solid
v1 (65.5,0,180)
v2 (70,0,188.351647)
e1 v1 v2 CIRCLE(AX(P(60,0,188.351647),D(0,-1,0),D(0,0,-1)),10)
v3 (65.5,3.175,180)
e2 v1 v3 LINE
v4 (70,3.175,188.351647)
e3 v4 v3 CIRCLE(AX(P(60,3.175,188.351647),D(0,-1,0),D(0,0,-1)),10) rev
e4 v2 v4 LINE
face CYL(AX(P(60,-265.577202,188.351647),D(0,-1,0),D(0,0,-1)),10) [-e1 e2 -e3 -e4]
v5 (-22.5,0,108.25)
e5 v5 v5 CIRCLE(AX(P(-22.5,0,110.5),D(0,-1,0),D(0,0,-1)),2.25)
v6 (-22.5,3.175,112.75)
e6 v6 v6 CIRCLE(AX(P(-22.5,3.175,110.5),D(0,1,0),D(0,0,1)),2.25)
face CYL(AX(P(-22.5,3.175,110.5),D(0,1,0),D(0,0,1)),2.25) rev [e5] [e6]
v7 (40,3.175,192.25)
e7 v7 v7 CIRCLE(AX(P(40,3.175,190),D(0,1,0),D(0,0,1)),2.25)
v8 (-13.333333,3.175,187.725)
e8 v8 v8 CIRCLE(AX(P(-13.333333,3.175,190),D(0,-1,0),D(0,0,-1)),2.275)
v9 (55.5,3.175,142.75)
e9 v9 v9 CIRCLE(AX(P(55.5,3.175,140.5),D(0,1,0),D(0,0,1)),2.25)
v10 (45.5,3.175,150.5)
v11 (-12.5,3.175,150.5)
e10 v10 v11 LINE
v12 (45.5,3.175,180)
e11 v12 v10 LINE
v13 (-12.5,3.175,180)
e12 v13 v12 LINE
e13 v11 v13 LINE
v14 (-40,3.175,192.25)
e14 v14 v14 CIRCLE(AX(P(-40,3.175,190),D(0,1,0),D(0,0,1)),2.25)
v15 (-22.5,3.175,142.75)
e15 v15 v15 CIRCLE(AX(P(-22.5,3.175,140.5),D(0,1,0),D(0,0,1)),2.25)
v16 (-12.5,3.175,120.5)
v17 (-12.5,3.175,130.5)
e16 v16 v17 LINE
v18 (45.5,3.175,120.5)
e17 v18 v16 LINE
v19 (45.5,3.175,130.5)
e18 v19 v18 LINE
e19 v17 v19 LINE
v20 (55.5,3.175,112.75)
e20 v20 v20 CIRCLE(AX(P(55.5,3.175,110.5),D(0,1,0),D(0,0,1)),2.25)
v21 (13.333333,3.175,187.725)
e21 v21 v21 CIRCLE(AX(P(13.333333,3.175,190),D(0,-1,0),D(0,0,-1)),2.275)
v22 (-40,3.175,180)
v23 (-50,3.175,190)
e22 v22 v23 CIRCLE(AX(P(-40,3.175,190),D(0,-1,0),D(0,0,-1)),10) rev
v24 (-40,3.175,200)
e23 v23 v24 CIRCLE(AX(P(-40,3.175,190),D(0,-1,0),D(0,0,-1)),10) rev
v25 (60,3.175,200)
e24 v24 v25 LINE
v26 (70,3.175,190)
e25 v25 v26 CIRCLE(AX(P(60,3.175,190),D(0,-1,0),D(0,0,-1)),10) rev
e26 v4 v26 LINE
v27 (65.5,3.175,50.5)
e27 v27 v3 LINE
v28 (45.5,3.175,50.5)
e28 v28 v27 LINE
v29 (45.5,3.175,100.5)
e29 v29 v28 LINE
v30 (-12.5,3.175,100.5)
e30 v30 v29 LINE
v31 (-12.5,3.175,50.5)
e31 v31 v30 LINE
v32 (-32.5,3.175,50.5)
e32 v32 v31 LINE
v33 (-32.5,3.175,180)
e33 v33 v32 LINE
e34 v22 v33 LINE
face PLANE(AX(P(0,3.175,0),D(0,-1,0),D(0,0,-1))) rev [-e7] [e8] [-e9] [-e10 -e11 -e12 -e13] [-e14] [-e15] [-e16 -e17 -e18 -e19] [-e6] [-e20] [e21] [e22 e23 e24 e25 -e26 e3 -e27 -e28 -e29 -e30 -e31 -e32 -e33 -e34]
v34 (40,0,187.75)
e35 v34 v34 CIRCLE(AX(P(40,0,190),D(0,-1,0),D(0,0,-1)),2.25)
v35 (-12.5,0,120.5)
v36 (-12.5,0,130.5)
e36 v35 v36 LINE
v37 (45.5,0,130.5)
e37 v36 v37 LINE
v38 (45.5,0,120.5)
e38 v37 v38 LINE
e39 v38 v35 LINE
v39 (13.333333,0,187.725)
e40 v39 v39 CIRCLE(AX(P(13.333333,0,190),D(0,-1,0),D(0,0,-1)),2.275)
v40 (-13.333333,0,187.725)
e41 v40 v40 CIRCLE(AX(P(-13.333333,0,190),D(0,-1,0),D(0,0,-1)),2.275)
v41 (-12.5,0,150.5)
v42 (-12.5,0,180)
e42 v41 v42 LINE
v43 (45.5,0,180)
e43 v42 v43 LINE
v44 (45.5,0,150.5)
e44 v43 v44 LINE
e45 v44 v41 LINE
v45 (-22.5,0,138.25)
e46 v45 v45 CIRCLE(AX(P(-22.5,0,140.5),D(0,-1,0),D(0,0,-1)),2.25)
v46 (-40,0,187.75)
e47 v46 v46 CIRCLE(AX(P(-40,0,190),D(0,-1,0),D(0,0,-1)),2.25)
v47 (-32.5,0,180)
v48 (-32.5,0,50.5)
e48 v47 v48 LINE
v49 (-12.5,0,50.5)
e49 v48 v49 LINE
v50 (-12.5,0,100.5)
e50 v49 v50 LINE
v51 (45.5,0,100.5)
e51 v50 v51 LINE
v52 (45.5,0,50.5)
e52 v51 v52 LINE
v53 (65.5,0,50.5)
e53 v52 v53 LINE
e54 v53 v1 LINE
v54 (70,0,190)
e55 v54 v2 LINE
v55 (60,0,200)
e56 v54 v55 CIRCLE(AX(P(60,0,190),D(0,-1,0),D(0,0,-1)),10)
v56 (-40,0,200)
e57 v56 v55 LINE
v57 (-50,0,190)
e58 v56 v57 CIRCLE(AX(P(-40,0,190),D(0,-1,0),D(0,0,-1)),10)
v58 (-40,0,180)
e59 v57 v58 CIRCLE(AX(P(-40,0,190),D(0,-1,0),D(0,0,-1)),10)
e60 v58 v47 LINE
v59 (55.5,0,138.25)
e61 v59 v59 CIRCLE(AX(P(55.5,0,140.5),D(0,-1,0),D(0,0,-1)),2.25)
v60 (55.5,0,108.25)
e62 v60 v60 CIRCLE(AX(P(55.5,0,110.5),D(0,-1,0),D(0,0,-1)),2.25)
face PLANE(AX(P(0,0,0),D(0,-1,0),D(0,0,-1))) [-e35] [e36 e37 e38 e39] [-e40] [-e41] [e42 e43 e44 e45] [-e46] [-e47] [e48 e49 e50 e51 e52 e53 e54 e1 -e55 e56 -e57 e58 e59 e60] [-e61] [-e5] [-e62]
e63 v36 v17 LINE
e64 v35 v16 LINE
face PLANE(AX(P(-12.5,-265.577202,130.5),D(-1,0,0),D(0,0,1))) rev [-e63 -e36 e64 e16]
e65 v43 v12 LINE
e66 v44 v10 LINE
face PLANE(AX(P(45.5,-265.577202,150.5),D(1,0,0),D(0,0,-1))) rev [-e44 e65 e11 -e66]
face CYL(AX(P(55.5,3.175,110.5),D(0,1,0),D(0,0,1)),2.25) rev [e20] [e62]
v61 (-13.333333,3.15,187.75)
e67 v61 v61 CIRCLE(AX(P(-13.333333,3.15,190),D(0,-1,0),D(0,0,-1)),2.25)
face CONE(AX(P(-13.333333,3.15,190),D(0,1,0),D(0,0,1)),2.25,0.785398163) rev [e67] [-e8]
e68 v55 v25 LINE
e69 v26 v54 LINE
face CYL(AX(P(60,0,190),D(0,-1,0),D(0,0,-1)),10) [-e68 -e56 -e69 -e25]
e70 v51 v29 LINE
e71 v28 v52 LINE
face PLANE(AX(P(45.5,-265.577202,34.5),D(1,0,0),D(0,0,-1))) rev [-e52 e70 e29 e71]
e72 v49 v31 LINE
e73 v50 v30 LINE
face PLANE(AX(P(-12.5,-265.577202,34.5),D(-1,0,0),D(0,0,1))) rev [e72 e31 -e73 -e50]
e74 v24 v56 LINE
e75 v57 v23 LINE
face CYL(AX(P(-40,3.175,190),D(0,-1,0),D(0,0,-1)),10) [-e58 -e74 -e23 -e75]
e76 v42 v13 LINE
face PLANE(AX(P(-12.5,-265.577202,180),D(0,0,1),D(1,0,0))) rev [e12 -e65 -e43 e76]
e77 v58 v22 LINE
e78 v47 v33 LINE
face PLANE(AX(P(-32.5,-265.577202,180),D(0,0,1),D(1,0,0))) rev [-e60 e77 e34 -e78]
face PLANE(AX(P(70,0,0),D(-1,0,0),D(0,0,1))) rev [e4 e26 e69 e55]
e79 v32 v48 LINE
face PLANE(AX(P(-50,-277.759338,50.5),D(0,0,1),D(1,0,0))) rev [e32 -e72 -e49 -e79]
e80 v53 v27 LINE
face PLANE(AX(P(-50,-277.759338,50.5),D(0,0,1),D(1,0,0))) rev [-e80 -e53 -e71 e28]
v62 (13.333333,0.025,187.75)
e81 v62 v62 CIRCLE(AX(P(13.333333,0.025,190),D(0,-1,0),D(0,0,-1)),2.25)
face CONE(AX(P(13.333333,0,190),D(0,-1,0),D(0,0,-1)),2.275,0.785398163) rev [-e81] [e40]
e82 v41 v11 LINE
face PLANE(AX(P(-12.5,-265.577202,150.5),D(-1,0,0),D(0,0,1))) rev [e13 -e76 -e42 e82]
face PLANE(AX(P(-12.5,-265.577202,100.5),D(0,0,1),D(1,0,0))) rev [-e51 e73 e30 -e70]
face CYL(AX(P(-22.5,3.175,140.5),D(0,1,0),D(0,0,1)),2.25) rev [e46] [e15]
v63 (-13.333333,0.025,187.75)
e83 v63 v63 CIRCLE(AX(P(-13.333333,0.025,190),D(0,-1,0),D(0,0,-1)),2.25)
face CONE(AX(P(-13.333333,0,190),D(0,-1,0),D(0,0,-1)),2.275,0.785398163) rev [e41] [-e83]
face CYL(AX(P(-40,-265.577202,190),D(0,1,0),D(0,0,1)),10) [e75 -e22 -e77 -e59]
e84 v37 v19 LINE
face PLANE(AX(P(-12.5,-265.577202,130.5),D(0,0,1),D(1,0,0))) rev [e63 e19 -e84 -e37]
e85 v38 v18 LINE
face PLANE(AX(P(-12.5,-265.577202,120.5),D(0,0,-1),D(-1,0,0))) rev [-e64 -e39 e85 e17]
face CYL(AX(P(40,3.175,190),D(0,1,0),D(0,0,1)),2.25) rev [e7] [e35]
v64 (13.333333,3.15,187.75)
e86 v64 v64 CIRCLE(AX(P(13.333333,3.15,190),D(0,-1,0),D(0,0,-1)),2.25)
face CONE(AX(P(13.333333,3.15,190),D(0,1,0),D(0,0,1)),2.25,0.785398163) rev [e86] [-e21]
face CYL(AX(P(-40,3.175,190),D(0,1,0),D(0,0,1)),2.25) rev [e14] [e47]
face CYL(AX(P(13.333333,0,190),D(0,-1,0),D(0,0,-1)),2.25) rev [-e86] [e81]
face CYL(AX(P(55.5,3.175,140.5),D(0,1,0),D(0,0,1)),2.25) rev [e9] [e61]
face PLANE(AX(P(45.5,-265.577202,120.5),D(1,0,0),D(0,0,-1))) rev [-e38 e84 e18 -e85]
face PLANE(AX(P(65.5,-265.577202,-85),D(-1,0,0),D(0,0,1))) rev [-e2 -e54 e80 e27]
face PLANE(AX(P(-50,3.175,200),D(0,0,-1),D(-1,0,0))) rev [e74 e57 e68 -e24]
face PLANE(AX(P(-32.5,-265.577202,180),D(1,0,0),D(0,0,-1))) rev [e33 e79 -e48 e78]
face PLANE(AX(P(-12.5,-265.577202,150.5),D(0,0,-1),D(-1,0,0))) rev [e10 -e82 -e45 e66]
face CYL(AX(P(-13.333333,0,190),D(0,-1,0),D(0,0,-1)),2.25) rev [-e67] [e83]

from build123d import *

# Parameters (mm, degrees)
SKETCH1_W                     = 100
SKETCH1_H                     = 400
BOSS_EXTRUDE1_DEPTH           = 3.175
M4_CLEARANCE_HOLE2_D          = 4.5
SKETCH7_W                     = 400
SKETCH7_H                     = 3.175
BOSS_EXTRUDE2_DEPTH           = 20
M4_CLEARANCE_HOLE1_D          = 4.5
SKETCH13_W                    = 17.5
SKETCH13_H                    = 265
SKETCH13_W_2                  = 58
SKETCH13_H_2                  = 69.5
SKETCH13_W_3                  = 4.5
SKETCH13_H_3                  = 66
SKETCH13_H_4                  = 10
SKETCH13_H_5                  = 29.5
SKETCH13_H_6                  = 75
CUT_EXTRUDE1_DEPTH            = 3.175
FILLET1_R                     = 10
SKETCH14_W                    = 120
SKETCH14_H                    = 250.5
CUT_EXTRUDE2_DEPTH            = 3.175
M4_CLEARANCE_HOLE3_AT_2_COUNT = 2
M4_CLEARANCE_HOLE3_AT_2_PITCH = 26.666666667


with BuildPart() as part:
    # Sketch1 → Boss-Extrude1 (new body)
    with BuildSketch(Plane(origin=(0, 0, 0), x_dir=(1, 0, 0), z_dir=(0, 1, 0))):
        Rectangle(SKETCH1_W, SKETCH1_H)
    extrude(amount=BOSS_EXTRUDE1_DEPTH)

    # M4 Clearance Hole2 (through all)
    with Locations(Plane(origin=(0, 3.175, 0), x_dir=(1, 0, 0), z_dir=(0, 1, 0))):
        with Locations((-40, 190), (40, 190), (40, -190), (-40, -190), (-40, 95), (40, 95)):
            Hole(M4_CLEARANCE_HOLE2_D / 2)

    # Sketch7 → Boss-Extrude2 (add)
    with BuildSketch(Plane(origin=(50, 0, 0), x_dir=(0, 0, -1), z_dir=(1, 0, 0))):
        with Locations((0, 1.5875)):
            Rectangle(SKETCH7_W, SKETCH7_H)
    extrude(amount=BOSS_EXTRUDE2_DEPTH)

    # M4 Clearance Hole1 (through all)
    with Locations(Plane(origin=(0, 3.175, 0), x_dir=(1, 0, 0), z_dir=(0, 1, 0))):
        with Locations((55.5, -140.5), (55.5, -110.5), (-22.5, -110.5), (-22.5, -140.5), (-22.5, -24.5), (-22.5, 5.5), (55.5, 5.5), (55.5, -24.5)):
            Hole(M4_CLEARANCE_HOLE1_D / 2)

    # Sketch13 → Cut-Extrude1 (cut)
    with BuildSketch(Plane(origin=(0, 3.175, 0), x_dir=(1, 0, 0), z_dir=(0, 1, 0))):
        with Locations((-41.25, -47.5)):
            Rectangle(SKETCH13_W, SKETCH13_H)
        with Locations((16.5, 50.25)):
            Rectangle(SKETCH13_W_2, SKETCH13_H_2)
        with Locations((67.75, -47.5)):
            Rectangle(SKETCH13_W_3, SKETCH13_H)
        with Locations((16.5, -67.5)):
            Rectangle(SKETCH13_W_2, SKETCH13_H_3)
        with Locations((16.5, -125.5)):
            Rectangle(SKETCH13_W_2, SKETCH13_H_4)
        with Locations((16.5, -165.25)):
            Rectangle(SKETCH13_W_2, SKETCH13_H_5)
        with Locations((-41.25, 142.5)):
            Rectangle(SKETCH13_W, SKETCH13_H_6)
        with Locations((16.5, 142.5)):
            Rectangle(SKETCH13_W_2, SKETCH13_H_6)
        with Locations((67.75, 142.5)):
            Rectangle(SKETCH13_W_3, SKETCH13_H_6)
        with Locations((16.5, -9.5)):
            Rectangle(SKETCH13_W_2, SKETCH13_H_4)
    extrude(amount=-CUT_EXTRUDE1_DEPTH, mode=Mode.SUBTRACT)

    # Fillet1
    # the kernel refuses this fillet: 10 mm, written as the material it takes off along each edge
    with BuildSketch(Plane(origin=(70, 24.054116361, -180), x_dir=(0, 0, -1), z_dir=(0, -1, 0)), Plane(origin=(70, 24.054116361, -85), x_dir=(0, 0, -1), z_dir=(0, -1, 0))) as fillet1_piece_1:
        with BuildLine():
            CenterArc((8.351646544, -10), FILLET1_R, 90, 56.632987031)
            Line((0, -4.5), (-0.167032931, -4.39))
            ThreePointArc((-0.167032931, -4.39), (-0.2, -2.25), (-0.2, 0))
            Line((-0.2, 0), (0, 0.2))
            Line((0, 0.2), (8.351646544, 0.2))
            Line((8.351646544, 0.2), (8.351646544, 0))
        make_face()
    extrude(amount=44.933232721, mode=Mode.SUBTRACT)
    with BuildSketch(Plane(origin=(70, -25, -200), x_dir=(-1, 0, 0), z_dir=(0, 1, 0)), Plane(origin=(-50, -25, -200), x_dir=(0, 0, 1), z_dir=(0, 1, 0)), Plane(origin=(70, 28.175, 200), x_dir=(-1, 0, 0), z_dir=(0, -1, 0)), Plane(origin=(-50, -25, 200), x_dir=(1, 0, 0), z_dir=(0, 1, 0))) as fillet1_piece_2:
        with BuildLine():
            CenterArc((FILLET1_R, FILLET1_R), FILLET1_R, 180, 90)
            Line((0, FILLET1_R), (-FILLET1_R * 0.02, FILLET1_R))
            Line((-FILLET1_R * 0.02, FILLET1_R), (-FILLET1_R * 0.02, -FILLET1_R * 0.02))
            Line((-FILLET1_R * 0.02, -FILLET1_R * 0.02), (FILLET1_R, -FILLET1_R * 0.02))
            Line((FILLET1_R, -FILLET1_R * 0.02), (FILLET1_R, 0))
        make_face()
    extrude(amount=53.175, mode=Mode.SUBTRACT)
    with BuildSketch(Plane(origin=(-50, 28.175, -180), x_dir=(1, 0, 0), z_dir=(0, -1, 0)), Plane(origin=(-50, 28.175, -85), x_dir=(1, 0, 0), z_dir=(0, -1, 0)), Plane(origin=(-50, 28.175, -105), x_dir=(0, 0, 1), z_dir=(0, -1, 0)), Plane(origin=(-50, 28.175, 180), x_dir=(0, 0, 1), z_dir=(0, -1, 0))) as fillet1_piece_3:
        with BuildLine():
            CenterArc((FILLET1_R, -FILLET1_R), FILLET1_R, 90, 90)
            Line((0, -FILLET1_R), (-FILLET1_R * 0.02, -FILLET1_R))
            Line((-FILLET1_R * 0.02, -FILLET1_R), (-FILLET1_R * 0.02, FILLET1_R * 0.02))
            Line((-FILLET1_R * 0.02, FILLET1_R * 0.02), (FILLET1_R, FILLET1_R * 0.02))
            Line((FILLET1_R, FILLET1_R * 0.02), (FILLET1_R, 0))
        make_face()
    extrude(amount=53.175, mode=Mode.SUBTRACT)
    with BuildSketch(Plane(origin=(70, 24.054116361, -105), x_dir=(-1.0, 0, 1.5347723092402606e-12), z_dir=(0, -1, 0))) as fillet1_piece_4:
        with BuildLine():
            CenterArc((10, -8.351646544), FILLET1_R, 123.367012969, 56.632987031)
            Line((0, -8.351646544), (-0.2, -8.351646544))
            Line((-0.2, -8.351646544), (-0.2, 0))
            Line((-0.2, 0), (0, 0.2))
            ThreePointArc((0, 0.2), (2.25, 0.2), (4.39, 0.167032931))
            Line((4.39, 0.167032931), (4.5, 0))
        make_face()
    extrude(amount=44.933232721, mode=Mode.SUBTRACT)
    with BuildSketch(Plane(origin=(70, 24.054116361, 180), x_dir=(0, 0, 1), z_dir=(0, -1, 0))) as fillet1_piece_5:
        with BuildLine():
            CenterArc((8.351646544, 10), FILLET1_R, 213.367012969, 56.632987031)
            Line((0, 4.5), (-0.167032931, 4.39))
            ThreePointArc((-0.167032931, 4.39), (-0.2, 2.25), (-0.2, 0))
            Line((-0.2, 0), (0, -0.2))
            Line((0, -0.2), (8.351646544, -0.2))
            Line((8.351646544, -0.2), (8.351646544, 0))
        make_face()
    extrude(amount=44.933232721, mode=Mode.SUBTRACT)

    # Sketch14 → Cut-Extrude2 (cut)
    with BuildSketch(Plane(origin=(0, 3.175, 0), x_dir=(1, 0, 0), z_dir=(0, 1, 0))):
        with Locations((10, 74.75)):
            Rectangle(SKETCH14_W, SKETCH14_H)
    extrude(amount=-CUT_EXTRUDE2_DEPTH, mode=Mode.SUBTRACT)

    # Sketch16 → M4 Clearance Hole3 (revolve, cut)
    with BuildSketch(Plane(origin=(13.333333333, 0, 190), x_dir=(0, 0, -1), z_dir=(1, 0, 0))):
        Polygon((0, 0), (0, 3.175), (2.275, 3.175), (2.25, 3.15), (2.25, 0.025), (2.275, 0), align=None)
    m4_clearance_hole3 = revolve(axis=Axis((13.333333333, -6.35, 190), (0, 1, 0)), mode=Mode.SUBTRACT)

    # M4 Clearance Hole3 at 2: M4 Clearance Hole3 ×2
    with Locations(*[(-i * M4_CLEARANCE_HOLE3_AT_2_PITCH, 0, 0) for i in range(1, M4_CLEARANCE_HOLE3_AT_2_COUNT)]):
        add(m4_clearance_hole3, mode=Mode.SUBTRACT)


solid = part.part
